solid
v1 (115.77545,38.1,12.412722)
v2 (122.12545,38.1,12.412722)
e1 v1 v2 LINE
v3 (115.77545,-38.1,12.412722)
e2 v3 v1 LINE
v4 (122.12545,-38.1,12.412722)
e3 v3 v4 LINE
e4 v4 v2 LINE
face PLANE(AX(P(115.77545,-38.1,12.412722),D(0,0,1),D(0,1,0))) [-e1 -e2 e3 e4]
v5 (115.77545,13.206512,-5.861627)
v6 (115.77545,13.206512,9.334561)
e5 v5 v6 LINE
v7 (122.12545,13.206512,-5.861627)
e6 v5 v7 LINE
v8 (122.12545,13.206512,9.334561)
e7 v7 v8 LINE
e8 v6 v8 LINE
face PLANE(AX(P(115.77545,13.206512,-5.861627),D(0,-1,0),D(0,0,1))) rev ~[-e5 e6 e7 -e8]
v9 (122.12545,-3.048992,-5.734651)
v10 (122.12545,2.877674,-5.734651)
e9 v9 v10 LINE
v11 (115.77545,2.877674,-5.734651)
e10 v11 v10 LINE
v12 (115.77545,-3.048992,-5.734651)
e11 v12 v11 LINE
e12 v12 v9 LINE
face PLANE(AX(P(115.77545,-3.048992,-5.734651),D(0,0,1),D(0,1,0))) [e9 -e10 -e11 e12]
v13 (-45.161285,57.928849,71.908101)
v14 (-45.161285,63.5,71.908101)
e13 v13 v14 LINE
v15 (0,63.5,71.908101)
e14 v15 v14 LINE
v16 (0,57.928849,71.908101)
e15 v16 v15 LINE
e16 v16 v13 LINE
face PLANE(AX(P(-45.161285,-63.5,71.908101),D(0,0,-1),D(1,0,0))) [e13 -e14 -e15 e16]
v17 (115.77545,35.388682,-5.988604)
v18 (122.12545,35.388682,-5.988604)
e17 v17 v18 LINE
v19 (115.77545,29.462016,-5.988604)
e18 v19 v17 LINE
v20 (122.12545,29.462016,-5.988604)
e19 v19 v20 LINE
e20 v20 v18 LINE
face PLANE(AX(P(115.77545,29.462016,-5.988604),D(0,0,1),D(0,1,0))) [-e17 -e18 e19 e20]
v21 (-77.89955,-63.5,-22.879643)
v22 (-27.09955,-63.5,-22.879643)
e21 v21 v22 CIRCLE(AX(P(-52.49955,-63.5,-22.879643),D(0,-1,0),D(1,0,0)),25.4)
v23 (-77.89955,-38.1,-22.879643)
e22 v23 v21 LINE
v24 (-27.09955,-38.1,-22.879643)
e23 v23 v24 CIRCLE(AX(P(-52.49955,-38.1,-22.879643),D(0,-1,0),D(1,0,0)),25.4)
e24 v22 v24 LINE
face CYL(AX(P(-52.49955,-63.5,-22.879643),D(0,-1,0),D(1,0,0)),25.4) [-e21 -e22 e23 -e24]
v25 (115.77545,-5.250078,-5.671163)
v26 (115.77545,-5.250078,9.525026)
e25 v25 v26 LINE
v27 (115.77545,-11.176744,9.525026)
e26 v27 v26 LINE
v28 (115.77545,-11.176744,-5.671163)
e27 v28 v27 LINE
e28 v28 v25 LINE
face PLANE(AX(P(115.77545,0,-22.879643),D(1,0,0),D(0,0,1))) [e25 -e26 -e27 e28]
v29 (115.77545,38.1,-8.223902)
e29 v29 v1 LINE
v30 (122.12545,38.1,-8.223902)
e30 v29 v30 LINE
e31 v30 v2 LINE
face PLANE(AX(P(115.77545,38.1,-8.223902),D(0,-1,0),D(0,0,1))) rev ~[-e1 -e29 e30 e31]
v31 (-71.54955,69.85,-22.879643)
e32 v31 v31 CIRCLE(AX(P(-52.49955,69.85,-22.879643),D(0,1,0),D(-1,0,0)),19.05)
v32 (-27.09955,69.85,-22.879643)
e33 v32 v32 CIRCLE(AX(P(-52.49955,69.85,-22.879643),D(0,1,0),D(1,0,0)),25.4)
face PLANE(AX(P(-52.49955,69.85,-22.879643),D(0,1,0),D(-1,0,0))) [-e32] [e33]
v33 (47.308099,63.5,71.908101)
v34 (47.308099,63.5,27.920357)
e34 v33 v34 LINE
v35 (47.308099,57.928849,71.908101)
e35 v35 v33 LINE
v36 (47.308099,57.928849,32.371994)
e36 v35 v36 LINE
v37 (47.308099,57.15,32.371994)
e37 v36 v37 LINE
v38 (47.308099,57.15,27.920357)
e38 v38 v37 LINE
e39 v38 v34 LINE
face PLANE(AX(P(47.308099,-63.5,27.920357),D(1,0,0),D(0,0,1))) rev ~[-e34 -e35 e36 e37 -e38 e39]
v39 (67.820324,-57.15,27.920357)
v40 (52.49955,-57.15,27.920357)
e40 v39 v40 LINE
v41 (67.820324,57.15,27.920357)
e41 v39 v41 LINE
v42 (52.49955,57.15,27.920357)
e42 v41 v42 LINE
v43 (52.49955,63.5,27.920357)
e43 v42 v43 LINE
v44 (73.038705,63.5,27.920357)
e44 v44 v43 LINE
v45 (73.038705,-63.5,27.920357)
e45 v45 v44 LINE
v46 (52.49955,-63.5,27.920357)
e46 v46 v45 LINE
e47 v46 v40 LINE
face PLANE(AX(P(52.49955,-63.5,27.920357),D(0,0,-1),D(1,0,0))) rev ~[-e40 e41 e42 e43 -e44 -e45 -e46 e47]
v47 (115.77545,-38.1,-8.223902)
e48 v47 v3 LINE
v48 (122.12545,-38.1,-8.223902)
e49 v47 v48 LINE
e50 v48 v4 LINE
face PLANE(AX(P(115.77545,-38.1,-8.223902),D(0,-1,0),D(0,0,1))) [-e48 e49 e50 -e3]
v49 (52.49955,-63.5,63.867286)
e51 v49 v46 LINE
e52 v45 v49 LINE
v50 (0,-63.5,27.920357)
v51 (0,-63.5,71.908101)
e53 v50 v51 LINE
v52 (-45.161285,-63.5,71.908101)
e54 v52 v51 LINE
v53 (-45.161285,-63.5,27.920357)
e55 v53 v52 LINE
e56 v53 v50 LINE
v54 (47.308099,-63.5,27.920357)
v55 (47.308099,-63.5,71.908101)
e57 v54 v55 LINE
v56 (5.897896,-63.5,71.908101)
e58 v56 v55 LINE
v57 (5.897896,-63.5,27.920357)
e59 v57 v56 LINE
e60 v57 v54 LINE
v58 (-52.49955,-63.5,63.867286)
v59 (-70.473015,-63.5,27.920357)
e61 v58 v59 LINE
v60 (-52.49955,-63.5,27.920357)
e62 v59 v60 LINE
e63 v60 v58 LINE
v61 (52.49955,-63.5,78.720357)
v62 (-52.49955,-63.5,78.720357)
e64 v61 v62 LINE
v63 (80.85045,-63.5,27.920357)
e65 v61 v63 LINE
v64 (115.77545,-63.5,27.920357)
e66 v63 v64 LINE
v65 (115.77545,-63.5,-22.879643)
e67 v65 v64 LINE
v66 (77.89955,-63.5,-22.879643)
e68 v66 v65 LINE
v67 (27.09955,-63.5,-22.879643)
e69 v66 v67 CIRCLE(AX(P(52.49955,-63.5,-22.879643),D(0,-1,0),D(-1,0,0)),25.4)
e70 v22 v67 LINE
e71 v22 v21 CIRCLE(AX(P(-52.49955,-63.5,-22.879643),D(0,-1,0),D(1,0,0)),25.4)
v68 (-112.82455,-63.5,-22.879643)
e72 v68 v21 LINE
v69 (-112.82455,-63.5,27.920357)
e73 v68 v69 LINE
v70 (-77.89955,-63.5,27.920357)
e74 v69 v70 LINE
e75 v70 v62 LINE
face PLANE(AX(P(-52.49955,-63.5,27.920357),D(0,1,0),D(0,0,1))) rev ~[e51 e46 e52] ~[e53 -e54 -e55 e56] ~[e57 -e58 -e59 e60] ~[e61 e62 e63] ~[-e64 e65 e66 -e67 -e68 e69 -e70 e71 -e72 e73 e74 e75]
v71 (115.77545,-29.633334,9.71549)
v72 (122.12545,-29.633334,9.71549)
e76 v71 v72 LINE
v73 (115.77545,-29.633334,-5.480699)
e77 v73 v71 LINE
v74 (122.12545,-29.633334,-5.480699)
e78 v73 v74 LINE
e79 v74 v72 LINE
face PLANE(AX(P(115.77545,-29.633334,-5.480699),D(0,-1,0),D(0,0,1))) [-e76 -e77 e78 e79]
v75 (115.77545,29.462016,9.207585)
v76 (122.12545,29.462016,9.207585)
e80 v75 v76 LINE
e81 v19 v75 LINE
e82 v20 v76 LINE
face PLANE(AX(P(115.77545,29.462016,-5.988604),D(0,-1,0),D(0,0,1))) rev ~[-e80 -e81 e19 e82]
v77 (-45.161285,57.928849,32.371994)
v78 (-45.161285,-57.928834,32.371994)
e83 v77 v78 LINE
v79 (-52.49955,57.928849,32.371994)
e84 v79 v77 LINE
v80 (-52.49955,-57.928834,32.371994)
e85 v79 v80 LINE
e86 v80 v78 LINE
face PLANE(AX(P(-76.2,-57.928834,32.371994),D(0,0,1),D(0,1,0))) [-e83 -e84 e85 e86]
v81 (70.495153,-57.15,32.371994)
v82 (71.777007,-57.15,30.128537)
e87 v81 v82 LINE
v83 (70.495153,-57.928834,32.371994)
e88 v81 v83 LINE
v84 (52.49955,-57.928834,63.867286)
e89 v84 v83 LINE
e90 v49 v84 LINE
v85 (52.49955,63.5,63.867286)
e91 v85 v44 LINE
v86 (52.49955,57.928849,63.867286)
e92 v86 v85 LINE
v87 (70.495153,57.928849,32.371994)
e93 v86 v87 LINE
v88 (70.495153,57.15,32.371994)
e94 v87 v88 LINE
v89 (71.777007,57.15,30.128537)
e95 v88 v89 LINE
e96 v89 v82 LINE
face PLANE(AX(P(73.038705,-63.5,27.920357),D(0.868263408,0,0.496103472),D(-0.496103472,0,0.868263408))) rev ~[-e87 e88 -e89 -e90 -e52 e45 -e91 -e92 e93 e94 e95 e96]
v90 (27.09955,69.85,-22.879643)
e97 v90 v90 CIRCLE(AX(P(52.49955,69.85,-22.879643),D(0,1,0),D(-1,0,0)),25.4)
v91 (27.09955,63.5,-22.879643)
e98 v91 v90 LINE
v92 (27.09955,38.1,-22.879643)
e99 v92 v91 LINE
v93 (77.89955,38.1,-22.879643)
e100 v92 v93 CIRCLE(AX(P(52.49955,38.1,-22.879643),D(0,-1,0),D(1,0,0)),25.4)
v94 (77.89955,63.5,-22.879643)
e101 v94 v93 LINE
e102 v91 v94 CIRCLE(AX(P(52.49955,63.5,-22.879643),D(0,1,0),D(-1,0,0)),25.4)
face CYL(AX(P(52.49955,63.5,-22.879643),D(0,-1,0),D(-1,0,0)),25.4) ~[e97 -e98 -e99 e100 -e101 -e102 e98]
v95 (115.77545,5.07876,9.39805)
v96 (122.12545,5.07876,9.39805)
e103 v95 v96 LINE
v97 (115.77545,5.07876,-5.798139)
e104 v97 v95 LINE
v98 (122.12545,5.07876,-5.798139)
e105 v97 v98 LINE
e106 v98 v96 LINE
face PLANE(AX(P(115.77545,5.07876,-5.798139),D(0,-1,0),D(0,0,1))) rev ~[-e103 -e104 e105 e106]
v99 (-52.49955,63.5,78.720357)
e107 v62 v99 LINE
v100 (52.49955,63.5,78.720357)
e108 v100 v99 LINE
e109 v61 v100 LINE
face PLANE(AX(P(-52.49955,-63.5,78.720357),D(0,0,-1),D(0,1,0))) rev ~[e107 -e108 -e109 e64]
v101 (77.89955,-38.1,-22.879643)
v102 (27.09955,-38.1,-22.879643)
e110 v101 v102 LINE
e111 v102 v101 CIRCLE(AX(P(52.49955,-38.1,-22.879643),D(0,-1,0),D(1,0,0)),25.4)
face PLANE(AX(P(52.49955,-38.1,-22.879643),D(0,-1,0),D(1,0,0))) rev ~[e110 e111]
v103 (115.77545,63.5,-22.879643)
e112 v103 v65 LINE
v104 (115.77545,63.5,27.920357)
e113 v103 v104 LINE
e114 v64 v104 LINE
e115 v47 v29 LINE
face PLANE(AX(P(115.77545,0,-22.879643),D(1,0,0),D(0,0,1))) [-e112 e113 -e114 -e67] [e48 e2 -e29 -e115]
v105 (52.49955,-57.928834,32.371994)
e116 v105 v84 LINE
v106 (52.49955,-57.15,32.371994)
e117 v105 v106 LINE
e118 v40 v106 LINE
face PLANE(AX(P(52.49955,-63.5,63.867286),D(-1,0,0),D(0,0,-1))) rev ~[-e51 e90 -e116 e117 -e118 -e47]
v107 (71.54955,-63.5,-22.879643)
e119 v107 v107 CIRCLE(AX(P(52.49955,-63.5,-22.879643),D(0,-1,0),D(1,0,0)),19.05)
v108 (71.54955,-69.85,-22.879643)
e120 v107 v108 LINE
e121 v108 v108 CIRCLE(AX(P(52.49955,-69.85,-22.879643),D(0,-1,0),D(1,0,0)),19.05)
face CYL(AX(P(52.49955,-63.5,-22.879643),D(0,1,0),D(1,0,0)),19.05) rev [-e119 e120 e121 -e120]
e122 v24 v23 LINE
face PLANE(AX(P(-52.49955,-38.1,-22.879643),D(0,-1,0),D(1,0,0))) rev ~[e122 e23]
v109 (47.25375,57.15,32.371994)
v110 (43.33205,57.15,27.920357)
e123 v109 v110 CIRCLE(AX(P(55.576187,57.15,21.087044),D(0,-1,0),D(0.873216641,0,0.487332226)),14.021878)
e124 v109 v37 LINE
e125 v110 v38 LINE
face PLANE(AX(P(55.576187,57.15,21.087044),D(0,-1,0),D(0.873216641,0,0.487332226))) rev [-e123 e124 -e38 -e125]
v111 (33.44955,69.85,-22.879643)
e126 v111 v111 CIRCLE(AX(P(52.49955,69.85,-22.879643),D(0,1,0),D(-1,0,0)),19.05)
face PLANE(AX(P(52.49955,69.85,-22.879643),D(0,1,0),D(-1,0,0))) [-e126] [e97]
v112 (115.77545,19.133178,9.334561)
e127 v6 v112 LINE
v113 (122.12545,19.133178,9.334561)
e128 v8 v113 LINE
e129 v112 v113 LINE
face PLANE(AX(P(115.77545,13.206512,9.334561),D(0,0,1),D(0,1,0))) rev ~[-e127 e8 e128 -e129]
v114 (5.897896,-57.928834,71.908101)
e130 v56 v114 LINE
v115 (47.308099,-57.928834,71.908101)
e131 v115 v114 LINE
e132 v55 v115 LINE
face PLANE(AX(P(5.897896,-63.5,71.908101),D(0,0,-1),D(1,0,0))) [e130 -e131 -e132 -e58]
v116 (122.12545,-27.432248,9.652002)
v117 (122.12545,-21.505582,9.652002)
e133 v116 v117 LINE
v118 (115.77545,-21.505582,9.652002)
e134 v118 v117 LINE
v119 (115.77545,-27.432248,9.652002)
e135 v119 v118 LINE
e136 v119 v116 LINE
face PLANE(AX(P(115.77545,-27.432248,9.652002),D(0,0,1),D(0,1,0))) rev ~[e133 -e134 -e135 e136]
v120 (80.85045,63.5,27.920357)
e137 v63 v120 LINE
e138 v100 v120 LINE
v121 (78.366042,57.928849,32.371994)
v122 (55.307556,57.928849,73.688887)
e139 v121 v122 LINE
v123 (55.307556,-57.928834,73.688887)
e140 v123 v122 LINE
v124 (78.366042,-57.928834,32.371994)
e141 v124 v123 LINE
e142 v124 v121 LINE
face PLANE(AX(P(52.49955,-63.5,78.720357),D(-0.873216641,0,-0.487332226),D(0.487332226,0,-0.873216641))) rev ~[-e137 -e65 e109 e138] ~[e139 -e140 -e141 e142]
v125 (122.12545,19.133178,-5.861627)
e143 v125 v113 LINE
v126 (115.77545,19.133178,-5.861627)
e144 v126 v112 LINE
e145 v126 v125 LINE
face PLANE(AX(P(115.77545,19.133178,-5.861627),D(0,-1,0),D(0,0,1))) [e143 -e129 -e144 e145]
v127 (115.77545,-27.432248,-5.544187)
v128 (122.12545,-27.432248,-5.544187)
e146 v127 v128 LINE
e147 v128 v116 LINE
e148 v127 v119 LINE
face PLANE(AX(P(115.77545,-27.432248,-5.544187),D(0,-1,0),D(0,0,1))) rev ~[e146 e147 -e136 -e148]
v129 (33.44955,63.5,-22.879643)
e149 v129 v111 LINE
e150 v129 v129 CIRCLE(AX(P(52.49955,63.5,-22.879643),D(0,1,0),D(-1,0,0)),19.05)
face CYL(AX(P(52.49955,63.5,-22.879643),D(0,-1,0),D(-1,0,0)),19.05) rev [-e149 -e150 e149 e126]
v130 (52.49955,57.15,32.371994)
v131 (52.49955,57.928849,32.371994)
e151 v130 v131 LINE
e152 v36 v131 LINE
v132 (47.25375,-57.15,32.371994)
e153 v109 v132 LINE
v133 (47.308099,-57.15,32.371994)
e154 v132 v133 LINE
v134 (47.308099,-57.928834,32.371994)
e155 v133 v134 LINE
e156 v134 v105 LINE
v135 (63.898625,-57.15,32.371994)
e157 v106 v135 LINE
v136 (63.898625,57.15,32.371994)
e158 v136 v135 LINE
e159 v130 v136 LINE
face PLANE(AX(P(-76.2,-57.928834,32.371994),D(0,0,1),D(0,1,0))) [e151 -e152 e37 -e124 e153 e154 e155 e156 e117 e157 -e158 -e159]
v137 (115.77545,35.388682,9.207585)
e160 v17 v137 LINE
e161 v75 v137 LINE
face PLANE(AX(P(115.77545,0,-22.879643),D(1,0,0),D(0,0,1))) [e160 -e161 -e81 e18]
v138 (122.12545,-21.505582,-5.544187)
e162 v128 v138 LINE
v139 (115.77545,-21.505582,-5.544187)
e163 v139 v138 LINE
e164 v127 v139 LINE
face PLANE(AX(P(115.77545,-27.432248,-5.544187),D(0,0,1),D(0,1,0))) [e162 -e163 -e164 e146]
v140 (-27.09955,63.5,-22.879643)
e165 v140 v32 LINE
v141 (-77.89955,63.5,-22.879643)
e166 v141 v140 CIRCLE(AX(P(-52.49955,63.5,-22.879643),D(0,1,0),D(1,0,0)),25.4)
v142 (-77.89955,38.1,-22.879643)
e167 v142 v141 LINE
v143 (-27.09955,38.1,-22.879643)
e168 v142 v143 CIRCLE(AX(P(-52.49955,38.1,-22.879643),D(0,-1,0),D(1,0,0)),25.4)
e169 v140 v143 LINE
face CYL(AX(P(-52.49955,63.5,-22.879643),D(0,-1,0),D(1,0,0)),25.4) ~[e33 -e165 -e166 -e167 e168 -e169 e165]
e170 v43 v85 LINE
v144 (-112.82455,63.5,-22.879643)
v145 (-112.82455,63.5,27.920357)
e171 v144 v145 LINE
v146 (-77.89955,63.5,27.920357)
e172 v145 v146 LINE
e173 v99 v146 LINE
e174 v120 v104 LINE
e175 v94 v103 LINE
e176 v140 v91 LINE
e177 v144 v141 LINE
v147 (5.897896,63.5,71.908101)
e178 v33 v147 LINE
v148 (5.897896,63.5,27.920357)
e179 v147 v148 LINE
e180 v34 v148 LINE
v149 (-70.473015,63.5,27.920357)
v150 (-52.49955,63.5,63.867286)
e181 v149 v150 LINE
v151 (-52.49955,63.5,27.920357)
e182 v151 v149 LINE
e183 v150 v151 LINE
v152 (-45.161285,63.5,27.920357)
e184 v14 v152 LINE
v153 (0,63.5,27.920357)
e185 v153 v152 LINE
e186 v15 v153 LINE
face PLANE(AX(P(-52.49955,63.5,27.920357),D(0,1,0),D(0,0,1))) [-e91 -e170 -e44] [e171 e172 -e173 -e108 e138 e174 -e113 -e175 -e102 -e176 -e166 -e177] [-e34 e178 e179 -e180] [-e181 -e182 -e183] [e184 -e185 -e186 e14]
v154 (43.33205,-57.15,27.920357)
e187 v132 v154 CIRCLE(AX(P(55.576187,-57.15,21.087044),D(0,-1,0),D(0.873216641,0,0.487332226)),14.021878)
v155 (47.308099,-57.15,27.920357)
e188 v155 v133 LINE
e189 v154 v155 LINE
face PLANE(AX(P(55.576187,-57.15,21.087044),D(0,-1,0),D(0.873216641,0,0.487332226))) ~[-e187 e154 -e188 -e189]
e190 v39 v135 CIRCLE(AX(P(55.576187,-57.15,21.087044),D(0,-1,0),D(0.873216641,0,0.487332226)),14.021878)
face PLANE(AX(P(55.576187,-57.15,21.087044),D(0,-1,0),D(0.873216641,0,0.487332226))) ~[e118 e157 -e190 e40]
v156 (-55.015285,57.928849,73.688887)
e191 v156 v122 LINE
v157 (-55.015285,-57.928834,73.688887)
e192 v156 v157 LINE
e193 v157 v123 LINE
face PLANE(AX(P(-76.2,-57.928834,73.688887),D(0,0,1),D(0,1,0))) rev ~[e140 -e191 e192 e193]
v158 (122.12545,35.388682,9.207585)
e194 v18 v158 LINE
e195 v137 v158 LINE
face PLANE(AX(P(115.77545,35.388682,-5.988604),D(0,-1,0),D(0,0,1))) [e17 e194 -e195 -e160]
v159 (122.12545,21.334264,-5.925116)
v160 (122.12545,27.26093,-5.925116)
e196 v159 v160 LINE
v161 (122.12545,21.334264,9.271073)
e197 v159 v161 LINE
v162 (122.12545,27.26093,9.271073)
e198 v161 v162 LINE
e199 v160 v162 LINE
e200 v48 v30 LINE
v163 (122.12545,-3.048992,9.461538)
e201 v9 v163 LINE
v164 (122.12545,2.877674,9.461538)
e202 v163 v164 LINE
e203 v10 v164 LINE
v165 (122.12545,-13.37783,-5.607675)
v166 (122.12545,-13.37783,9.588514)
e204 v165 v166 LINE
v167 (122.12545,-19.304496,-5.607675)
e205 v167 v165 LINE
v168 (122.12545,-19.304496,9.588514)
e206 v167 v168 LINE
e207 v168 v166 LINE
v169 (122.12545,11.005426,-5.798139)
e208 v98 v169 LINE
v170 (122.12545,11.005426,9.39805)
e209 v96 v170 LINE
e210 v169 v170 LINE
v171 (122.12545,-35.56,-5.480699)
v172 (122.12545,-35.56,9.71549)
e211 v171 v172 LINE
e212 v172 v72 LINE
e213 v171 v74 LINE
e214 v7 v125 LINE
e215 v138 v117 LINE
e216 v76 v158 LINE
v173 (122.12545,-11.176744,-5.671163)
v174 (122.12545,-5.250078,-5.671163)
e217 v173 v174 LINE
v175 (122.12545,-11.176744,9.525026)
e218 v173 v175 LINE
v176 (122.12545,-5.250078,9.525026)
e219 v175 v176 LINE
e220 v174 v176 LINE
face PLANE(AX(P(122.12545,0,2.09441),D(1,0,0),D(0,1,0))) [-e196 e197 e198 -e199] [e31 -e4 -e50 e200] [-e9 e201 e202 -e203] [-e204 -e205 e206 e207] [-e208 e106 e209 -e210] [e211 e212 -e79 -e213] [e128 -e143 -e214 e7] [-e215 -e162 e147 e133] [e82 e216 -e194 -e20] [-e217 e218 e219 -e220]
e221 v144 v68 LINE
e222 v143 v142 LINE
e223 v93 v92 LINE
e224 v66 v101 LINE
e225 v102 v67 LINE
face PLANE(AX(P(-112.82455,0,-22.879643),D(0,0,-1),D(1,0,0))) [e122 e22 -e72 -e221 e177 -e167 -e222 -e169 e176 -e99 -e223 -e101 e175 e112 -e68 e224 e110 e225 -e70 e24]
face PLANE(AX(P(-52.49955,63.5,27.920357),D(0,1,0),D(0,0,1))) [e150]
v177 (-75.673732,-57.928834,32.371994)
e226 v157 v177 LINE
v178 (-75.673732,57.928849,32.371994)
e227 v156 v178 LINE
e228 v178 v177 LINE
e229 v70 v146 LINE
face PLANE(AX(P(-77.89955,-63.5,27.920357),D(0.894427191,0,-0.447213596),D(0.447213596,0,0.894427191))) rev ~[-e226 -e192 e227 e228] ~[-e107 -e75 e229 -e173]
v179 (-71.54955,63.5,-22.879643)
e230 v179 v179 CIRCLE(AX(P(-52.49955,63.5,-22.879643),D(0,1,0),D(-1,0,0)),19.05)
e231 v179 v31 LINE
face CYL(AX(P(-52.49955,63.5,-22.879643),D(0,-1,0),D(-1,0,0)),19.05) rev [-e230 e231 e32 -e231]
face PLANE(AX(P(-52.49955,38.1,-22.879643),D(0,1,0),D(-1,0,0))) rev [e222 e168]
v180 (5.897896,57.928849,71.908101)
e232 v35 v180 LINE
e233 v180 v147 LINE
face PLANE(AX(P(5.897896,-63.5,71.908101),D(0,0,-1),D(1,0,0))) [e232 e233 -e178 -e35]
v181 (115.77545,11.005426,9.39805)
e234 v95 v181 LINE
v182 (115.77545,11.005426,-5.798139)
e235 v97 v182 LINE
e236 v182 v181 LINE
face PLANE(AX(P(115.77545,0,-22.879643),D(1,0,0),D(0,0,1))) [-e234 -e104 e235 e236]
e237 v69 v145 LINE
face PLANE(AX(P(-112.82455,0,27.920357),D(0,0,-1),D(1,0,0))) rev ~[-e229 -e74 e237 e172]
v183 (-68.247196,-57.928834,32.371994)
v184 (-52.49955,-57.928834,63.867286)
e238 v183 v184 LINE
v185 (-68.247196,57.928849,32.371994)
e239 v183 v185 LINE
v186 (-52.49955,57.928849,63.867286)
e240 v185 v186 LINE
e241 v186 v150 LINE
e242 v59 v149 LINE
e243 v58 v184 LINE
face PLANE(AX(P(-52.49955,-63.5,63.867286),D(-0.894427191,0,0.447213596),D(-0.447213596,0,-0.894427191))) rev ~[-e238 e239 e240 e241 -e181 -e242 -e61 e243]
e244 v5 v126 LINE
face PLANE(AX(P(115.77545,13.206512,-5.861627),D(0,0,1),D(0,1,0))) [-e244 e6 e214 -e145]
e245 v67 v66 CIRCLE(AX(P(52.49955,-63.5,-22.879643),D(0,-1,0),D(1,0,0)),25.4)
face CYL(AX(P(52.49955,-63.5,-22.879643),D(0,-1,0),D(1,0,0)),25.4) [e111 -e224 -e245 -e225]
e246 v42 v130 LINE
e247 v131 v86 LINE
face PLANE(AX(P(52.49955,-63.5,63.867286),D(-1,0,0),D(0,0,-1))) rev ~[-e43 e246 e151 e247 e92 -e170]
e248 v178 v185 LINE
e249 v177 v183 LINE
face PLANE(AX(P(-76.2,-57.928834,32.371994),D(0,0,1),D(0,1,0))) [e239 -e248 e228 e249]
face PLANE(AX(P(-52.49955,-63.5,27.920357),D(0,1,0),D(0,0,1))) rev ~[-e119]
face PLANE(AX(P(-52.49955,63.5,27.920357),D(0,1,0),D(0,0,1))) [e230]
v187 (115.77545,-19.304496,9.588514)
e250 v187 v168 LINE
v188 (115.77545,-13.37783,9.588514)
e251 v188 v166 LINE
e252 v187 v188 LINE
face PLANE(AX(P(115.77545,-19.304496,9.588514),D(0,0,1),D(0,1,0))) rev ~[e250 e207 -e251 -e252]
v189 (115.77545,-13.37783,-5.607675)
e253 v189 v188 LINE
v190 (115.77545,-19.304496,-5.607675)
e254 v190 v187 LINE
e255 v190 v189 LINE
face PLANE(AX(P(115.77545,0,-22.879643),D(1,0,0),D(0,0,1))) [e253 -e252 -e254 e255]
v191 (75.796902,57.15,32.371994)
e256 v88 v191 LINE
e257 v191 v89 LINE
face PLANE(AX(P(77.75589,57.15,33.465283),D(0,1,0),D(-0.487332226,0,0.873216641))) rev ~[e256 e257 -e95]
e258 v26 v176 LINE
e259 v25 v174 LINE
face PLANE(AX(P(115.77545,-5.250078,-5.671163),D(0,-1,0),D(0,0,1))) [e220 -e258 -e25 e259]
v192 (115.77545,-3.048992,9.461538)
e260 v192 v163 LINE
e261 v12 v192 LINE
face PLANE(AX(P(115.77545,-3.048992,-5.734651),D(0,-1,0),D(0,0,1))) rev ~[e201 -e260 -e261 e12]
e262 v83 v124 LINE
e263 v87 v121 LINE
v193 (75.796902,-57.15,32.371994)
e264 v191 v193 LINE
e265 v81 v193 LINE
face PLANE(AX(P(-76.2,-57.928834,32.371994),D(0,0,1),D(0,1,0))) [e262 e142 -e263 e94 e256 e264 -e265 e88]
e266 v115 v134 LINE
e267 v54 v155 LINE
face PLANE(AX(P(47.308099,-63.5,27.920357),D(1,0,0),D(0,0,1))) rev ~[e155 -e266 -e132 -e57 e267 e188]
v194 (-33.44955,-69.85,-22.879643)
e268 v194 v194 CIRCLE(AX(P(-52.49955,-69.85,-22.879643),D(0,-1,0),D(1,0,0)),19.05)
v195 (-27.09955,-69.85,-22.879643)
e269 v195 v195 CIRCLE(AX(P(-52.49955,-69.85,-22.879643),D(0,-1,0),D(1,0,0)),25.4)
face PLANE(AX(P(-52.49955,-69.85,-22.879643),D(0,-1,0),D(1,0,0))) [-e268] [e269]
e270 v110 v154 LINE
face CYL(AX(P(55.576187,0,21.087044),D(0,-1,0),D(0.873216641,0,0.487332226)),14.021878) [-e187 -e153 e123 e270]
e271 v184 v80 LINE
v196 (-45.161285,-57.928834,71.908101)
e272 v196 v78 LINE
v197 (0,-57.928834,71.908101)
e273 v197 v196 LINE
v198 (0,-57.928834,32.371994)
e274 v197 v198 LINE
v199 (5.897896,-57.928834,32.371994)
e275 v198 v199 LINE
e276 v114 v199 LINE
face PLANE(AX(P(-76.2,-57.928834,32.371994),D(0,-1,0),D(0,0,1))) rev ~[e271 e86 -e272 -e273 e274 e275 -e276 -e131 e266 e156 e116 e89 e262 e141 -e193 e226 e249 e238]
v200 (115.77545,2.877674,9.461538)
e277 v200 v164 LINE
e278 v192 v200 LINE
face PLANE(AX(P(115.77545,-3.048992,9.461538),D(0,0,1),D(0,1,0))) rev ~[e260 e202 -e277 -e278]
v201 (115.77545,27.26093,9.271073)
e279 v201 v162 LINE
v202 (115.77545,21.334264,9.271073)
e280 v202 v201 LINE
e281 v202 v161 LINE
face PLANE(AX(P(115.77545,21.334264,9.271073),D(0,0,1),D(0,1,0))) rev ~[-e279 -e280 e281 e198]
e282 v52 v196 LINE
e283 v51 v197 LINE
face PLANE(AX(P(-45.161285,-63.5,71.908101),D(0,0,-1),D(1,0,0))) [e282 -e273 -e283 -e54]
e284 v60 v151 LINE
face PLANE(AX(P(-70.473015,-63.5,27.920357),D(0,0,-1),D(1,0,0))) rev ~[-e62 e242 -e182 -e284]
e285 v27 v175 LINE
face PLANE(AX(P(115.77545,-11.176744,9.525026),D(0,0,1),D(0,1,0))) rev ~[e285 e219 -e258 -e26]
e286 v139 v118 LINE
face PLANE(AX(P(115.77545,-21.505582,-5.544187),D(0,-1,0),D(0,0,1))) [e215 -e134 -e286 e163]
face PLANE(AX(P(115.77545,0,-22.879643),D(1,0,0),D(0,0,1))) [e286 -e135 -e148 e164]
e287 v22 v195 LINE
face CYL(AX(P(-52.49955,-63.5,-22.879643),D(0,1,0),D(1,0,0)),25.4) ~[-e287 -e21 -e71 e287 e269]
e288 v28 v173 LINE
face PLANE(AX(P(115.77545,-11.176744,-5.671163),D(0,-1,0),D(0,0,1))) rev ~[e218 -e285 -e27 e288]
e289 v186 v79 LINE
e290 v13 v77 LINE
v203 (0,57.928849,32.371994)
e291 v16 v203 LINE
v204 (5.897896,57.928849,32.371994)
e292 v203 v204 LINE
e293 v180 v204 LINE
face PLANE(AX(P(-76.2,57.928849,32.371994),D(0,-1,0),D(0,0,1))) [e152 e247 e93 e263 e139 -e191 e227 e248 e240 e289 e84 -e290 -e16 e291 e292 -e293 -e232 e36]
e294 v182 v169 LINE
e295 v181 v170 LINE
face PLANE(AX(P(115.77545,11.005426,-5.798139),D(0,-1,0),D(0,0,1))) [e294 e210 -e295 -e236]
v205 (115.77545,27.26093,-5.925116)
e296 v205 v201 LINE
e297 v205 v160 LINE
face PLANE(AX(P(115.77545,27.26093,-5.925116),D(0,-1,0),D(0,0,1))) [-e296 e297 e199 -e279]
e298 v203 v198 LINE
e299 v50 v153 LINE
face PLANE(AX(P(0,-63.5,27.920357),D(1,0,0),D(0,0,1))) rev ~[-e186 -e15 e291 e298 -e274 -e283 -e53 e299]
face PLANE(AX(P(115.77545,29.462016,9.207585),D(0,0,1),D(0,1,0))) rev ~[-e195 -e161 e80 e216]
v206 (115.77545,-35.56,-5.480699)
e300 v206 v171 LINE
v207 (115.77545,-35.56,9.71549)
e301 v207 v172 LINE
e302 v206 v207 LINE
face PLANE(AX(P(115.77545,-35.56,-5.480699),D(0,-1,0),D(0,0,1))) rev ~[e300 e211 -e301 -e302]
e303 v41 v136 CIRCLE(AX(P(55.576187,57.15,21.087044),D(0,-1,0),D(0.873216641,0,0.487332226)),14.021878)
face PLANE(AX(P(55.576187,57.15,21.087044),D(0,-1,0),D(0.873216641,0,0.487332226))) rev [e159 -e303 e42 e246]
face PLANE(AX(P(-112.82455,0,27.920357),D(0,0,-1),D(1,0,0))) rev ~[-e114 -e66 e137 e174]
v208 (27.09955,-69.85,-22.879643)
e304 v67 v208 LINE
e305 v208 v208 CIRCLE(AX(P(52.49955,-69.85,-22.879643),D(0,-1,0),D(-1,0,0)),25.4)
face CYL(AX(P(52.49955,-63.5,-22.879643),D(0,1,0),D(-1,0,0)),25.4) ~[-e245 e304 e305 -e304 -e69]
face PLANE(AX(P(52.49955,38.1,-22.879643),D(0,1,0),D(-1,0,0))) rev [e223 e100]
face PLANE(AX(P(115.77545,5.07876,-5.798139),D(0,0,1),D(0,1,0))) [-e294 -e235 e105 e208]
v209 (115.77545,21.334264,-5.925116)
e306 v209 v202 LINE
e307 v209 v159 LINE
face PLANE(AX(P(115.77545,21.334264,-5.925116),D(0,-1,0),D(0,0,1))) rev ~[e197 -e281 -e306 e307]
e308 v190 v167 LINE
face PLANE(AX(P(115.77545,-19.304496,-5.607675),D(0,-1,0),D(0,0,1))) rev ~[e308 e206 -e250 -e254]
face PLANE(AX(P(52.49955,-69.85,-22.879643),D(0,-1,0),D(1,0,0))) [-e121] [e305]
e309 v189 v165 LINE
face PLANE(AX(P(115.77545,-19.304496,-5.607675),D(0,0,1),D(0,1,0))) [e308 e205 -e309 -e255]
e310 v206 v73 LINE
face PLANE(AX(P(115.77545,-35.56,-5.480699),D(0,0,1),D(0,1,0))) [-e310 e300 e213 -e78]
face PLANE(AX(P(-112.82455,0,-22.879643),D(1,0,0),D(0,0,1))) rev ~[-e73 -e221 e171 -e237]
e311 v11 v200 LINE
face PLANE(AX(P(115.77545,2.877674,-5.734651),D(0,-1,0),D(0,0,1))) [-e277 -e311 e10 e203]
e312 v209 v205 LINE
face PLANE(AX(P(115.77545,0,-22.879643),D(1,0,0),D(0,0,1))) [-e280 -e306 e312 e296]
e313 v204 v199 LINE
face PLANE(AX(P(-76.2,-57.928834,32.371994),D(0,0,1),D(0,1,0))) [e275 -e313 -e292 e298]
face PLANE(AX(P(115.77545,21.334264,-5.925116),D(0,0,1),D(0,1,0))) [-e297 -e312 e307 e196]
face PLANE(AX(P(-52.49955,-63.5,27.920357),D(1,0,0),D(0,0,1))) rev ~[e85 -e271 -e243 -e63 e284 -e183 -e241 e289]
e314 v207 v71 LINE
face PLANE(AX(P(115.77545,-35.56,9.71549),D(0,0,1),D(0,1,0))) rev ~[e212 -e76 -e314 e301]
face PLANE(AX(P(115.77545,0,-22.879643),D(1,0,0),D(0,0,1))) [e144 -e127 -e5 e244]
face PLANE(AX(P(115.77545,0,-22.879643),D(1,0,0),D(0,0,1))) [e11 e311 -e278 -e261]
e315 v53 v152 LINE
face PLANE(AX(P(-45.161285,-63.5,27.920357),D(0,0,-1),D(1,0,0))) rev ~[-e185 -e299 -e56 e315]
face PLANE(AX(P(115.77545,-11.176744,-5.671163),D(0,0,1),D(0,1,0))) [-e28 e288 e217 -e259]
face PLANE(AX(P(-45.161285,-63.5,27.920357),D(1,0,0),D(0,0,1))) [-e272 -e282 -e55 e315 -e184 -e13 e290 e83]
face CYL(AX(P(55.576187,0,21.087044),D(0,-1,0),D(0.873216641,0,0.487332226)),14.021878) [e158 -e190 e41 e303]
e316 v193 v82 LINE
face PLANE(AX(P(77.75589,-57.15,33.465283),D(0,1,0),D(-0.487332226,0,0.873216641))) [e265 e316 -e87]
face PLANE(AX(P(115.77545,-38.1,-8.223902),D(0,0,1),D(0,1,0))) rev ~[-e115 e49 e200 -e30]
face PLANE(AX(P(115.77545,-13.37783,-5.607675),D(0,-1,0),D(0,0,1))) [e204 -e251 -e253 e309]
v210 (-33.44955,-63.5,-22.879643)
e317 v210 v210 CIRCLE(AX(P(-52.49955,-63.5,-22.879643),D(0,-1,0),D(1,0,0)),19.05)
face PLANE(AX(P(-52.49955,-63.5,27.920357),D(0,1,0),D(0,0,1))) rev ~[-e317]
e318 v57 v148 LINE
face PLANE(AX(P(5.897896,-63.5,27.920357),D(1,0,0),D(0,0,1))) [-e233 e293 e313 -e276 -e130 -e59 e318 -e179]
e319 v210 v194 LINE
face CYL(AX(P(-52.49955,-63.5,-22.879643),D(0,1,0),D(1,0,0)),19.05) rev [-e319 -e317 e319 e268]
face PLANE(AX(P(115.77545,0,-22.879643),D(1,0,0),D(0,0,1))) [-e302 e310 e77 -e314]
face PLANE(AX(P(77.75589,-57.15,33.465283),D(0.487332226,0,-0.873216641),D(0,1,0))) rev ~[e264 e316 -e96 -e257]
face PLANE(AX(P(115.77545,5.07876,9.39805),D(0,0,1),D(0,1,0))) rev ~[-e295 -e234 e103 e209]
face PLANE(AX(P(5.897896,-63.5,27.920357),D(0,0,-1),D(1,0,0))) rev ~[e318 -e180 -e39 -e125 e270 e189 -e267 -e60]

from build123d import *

# Parameters (mm, degrees)
F0_W       = 228.6
F0_H       = 50.8
F1_DEPTH   = 63.5
F2_R       = 25.4
F3_DEPTH   = 25.4
F5_W       = 133.35
F5_H       = 127
F6_DEPTH   = 50.8
F8_DEPTH   = 127.001
F9_W       = 114.3
F9_H       = 45.4757122113
F10_DEPTH  = 25.4
F11_DEPTH  = 25.4
F13_DEPTH  = 127.001
F14_W      = 45.1612845063
F14_H      = 43.987744288
F14_W_2    = 41.4102021605
F15_DEPTH  = 127.001
F15_FACE_W = 114.3
F15_FACE_H = 14.0218776853
F18_W      = 115.8576831222
F18_H      = 41.3168929517
F19_DEPTH  = 191.9764496515
F20_W      = 76.2
F20_H      = 20.6366241442
F20_W_2    = 5.92666582
F20_H_2    = 15.1961888187
F21_DEPTH  = 6.35
F22_R      = 19.05
F23_DEPTH  = 6.35
F24_R      = 19.05
F25_DEPTH  = 6.35


with BuildPart() as f1:
    # F0 (on Front) → F1 (new body, symmetric)
    with BuildSketch(Plane.XZ):
        with Locations((1.4754496515, 2.5203571515)):
            Rectangle(F0_W, F0_H)
    extrude(amount=F1_DEPTH, both=True)

    # F2 (on face) → F3 (join)
    with BuildSketch(Plane.XZ.offset(63.5)):
        with BuildLine():
            ThreePointArc((-77.8995503485, -22.8796428485), (-52.4995503485, -48.2796428485), (-27.0995503485, -22.8796428485))
            ThreePointArc((-27.0995503485, -22.8796428485), (-52.4995503485, 2.5203571515), (-77.8995503485, -22.8796428485))
        make_face()
        with Locations((52.4995503485, -22.8796428485)):
            Circle(F2_R)
    extrude(amount=-F3_DEPTH)

    # F4: F1 across plane


with BuildPart() as f1_1:
    add(f1.part)
    add(f1.part.mirror(Plane.XZ))

    # F5 (on face) → F6 (join)
    with BuildSketch(Plane.XY.offset(27.9203571515)):
        with Locations((14.1754496515, 0)):
            Rectangle(F5_W, F5_H)
    extrude(amount=F6_DEPTH)

    # F7 (on face) → F8 (cut, through all)
    with BuildSketch(Plane.XZ.offset(63.5)):
        Polygon((80.8504496515, 78.7203571515), (52.4995503485, 78.7203571515), (80.8504496515, 27.9203571515), align=None)
    extrude(amount=-F8_DEPTH, mode=Mode.SUBTRACT)

    # F9 (on face) → F10 (cut)
    with BuildSketch(Plane(origin=(73.5304715342, 0, 41.0365156332), x_dir=(0, 1, 0), z_dir=(0.8732166409, 0, 0.4873322255))):
        with Locations((0, 14.0673470279)):
            Rectangle(F9_W, F9_H)
    extrude(amount=-F10_DEPTH, mode=Mode.SUBTRACT)

    # F11 (add): a face of the model
    f11_faces = [f1_1.faces().sort_by_distance(p)[0] for p in [
        (-52.4995503485, 0, 53.3203571515),
    ]]
    extrude(f11_faces, amount=F11_DEPTH)

    # F12 (on face) → F13 (cut, through all)
    with BuildSketch(Plane.XZ.offset(63.5)):
        Polygon((-77.8995503485, 78.7203571515), (-77.8995503485, 27.9203571515), (-52.4995503485, 78.7203571515), align=None)
    extrude(amount=-F13_DEPTH, mode=Mode.SUBTRACT)

    # F14 (on face) → F15 (cut, through all)
    with BuildSketch(Plane.XZ.offset(63.5)):
        Polygon((-52.4995503485, 27.9203571515), (-52.4995503485, 63.8672858477), (-70.4730146966, 27.9203571515), align=None)
        with Locations((-22.5806422532, 49.9142292955)):
            Rectangle(F14_W, F14_H)
        with Locations((26.6029974446, 49.9142292955)):
            Rectangle(F14_W_2, F14_H)
        Polygon((73.0387046933, 27.9203571515), (52.4995503485, 63.8672858477), (52.4995503485, 27.9203571515), align=None)
    extrude(amount=-F15_DEPTH, mode=Mode.SUBTRACT)

    # F15_face (on face) → F16 (revolve)
    with BuildSketch(Plane(origin=(61.698255806, 0, 24.5037007223), x_dir=(0, -1, 0), z_dir=(-0.4873322255, 0, 0.8732166409))):
        Rectangle(F15_FACE_W, F15_FACE_H)
    revolve(axis=Axis((55.5761873402, 0, 21.0870442932), (0, -1, 0)))

    # F18 (on offset) → F19 (cut, through all)
    with BuildSketch(Plane.YZ.offset(-76.2)):
        with Locations((7.4506e-06, 53.0304405838)):
            Rectangle(F18_W, F18_H)
    extrude(amount=F19_DEPTH, mode=Mode.SUBTRACT)

    # F20 (on face) → F21 (join)
    with BuildSketch(Plane.YZ.offset(115.7754496515)):
        with Locations((0, 2.0944098942)):
            Rectangle(F20_W, F20_H)
        with Locations((-32.59666709, 2.1173956338)):
            Rectangle(F20_W_2, F20_H_2, mode=Mode.SUBTRACT)
        with Locations((-24.4689150477, 2.0539075275)):
            Rectangle(F20_W_2, F20_H_2, mode=Mode.SUBTRACT)
        with Locations((-16.3411630055, 1.9904194212)):
            Rectangle(F20_W_2, F20_H_2, mode=Mode.SUBTRACT)
        with Locations((-8.2134109632, 1.9269313149)):
            Rectangle(F20_W_2, F20_H_2, mode=Mode.SUBTRACT)
        with Locations((-0.085658921, 1.8634432086)):
            Rectangle(F20_W_2, F20_H_2, mode=Mode.SUBTRACT)
        with Locations((8.0420931213, 1.7999551023)):
            Rectangle(F20_W_2, F20_H_2, mode=Mode.SUBTRACT)
        with Locations((16.1698451635, 1.736466996)):
            Rectangle(F20_W_2, F20_H_2, mode=Mode.SUBTRACT)
        with Locations((24.2975972058, 1.6729788898)):
            Rectangle(F20_W_2, F20_H_2, mode=Mode.SUBTRACT)
        with Locations((32.425349248, 1.6094907835)):
            Rectangle(F20_W_2, F20_H_2, mode=Mode.SUBTRACT)
    extrude(amount=F21_DEPTH)

    # F22 (on face) → F23 (join)
    with BuildSketch(Plane(origin=(0, 63.5, 0), x_dir=(-1, 0, 0), z_dir=(0, 1, 0))):
        with BuildLine():
            ThreePointArc((-77.8995503485, -22.8796428485), (-52.4995503485, -48.2796428485), (-27.0995503485, -22.8796428485))
            ThreePointArc((-27.0995503485, -22.8796428485), (-52.4995503485, 2.5203571515), (-77.8995503485, -22.8796428485))
        make_face()
        with Locations((-52.4995503485, -22.8796428485)):
            Circle(F22_R, mode=Mode.SUBTRACT)
        with BuildLine():
            ThreePointArc((77.8995503485, -22.8796428485), (52.4995503485, 2.5203571515), (27.0995503485, -22.8796428485))
            ThreePointArc((27.0995503485, -22.8796428485), (52.4995503485, -48.2796428485), (77.8995503485, -22.8796428485))
        make_face()
        with Locations((52.4995503485, -22.8796428485)):
            Circle(F22_R, mode=Mode.SUBTRACT)
    extrude(amount=F23_DEPTH)

    # F24 (on face) → F25 (join)
    with BuildSketch(Plane.XZ.offset(63.5)):
        with BuildLine():
            ThreePointArc((-77.8995503485, -22.8796428485), (-52.4995503485, -48.2796428485), (-27.0995503485, -22.8796428485))
            ThreePointArc((-27.0995503485, -22.8796428485), (-52.4995503485, 2.5203571515), (-77.8995503485, -22.8796428485))
        make_face()
        with Locations((-52.4995503485, -22.8796428485)):
            Circle(F24_R, mode=Mode.SUBTRACT)
        with BuildLine():
            ThreePointArc((77.8995503485, -22.8796428485), (52.4995503485, 2.5203571515), (27.0995503485, -22.8796428485))
            ThreePointArc((27.0995503485, -22.8796428485), (52.4995503485, -48.2796428485), (77.8995503485, -22.8796428485))
        make_face()
        with Locations((52.4995503485, -22.8796428485)):
            Circle(F24_R, mode=Mode.SUBTRACT)
    extrude(amount=F25_DEPTH)


solid = f1_1.part
